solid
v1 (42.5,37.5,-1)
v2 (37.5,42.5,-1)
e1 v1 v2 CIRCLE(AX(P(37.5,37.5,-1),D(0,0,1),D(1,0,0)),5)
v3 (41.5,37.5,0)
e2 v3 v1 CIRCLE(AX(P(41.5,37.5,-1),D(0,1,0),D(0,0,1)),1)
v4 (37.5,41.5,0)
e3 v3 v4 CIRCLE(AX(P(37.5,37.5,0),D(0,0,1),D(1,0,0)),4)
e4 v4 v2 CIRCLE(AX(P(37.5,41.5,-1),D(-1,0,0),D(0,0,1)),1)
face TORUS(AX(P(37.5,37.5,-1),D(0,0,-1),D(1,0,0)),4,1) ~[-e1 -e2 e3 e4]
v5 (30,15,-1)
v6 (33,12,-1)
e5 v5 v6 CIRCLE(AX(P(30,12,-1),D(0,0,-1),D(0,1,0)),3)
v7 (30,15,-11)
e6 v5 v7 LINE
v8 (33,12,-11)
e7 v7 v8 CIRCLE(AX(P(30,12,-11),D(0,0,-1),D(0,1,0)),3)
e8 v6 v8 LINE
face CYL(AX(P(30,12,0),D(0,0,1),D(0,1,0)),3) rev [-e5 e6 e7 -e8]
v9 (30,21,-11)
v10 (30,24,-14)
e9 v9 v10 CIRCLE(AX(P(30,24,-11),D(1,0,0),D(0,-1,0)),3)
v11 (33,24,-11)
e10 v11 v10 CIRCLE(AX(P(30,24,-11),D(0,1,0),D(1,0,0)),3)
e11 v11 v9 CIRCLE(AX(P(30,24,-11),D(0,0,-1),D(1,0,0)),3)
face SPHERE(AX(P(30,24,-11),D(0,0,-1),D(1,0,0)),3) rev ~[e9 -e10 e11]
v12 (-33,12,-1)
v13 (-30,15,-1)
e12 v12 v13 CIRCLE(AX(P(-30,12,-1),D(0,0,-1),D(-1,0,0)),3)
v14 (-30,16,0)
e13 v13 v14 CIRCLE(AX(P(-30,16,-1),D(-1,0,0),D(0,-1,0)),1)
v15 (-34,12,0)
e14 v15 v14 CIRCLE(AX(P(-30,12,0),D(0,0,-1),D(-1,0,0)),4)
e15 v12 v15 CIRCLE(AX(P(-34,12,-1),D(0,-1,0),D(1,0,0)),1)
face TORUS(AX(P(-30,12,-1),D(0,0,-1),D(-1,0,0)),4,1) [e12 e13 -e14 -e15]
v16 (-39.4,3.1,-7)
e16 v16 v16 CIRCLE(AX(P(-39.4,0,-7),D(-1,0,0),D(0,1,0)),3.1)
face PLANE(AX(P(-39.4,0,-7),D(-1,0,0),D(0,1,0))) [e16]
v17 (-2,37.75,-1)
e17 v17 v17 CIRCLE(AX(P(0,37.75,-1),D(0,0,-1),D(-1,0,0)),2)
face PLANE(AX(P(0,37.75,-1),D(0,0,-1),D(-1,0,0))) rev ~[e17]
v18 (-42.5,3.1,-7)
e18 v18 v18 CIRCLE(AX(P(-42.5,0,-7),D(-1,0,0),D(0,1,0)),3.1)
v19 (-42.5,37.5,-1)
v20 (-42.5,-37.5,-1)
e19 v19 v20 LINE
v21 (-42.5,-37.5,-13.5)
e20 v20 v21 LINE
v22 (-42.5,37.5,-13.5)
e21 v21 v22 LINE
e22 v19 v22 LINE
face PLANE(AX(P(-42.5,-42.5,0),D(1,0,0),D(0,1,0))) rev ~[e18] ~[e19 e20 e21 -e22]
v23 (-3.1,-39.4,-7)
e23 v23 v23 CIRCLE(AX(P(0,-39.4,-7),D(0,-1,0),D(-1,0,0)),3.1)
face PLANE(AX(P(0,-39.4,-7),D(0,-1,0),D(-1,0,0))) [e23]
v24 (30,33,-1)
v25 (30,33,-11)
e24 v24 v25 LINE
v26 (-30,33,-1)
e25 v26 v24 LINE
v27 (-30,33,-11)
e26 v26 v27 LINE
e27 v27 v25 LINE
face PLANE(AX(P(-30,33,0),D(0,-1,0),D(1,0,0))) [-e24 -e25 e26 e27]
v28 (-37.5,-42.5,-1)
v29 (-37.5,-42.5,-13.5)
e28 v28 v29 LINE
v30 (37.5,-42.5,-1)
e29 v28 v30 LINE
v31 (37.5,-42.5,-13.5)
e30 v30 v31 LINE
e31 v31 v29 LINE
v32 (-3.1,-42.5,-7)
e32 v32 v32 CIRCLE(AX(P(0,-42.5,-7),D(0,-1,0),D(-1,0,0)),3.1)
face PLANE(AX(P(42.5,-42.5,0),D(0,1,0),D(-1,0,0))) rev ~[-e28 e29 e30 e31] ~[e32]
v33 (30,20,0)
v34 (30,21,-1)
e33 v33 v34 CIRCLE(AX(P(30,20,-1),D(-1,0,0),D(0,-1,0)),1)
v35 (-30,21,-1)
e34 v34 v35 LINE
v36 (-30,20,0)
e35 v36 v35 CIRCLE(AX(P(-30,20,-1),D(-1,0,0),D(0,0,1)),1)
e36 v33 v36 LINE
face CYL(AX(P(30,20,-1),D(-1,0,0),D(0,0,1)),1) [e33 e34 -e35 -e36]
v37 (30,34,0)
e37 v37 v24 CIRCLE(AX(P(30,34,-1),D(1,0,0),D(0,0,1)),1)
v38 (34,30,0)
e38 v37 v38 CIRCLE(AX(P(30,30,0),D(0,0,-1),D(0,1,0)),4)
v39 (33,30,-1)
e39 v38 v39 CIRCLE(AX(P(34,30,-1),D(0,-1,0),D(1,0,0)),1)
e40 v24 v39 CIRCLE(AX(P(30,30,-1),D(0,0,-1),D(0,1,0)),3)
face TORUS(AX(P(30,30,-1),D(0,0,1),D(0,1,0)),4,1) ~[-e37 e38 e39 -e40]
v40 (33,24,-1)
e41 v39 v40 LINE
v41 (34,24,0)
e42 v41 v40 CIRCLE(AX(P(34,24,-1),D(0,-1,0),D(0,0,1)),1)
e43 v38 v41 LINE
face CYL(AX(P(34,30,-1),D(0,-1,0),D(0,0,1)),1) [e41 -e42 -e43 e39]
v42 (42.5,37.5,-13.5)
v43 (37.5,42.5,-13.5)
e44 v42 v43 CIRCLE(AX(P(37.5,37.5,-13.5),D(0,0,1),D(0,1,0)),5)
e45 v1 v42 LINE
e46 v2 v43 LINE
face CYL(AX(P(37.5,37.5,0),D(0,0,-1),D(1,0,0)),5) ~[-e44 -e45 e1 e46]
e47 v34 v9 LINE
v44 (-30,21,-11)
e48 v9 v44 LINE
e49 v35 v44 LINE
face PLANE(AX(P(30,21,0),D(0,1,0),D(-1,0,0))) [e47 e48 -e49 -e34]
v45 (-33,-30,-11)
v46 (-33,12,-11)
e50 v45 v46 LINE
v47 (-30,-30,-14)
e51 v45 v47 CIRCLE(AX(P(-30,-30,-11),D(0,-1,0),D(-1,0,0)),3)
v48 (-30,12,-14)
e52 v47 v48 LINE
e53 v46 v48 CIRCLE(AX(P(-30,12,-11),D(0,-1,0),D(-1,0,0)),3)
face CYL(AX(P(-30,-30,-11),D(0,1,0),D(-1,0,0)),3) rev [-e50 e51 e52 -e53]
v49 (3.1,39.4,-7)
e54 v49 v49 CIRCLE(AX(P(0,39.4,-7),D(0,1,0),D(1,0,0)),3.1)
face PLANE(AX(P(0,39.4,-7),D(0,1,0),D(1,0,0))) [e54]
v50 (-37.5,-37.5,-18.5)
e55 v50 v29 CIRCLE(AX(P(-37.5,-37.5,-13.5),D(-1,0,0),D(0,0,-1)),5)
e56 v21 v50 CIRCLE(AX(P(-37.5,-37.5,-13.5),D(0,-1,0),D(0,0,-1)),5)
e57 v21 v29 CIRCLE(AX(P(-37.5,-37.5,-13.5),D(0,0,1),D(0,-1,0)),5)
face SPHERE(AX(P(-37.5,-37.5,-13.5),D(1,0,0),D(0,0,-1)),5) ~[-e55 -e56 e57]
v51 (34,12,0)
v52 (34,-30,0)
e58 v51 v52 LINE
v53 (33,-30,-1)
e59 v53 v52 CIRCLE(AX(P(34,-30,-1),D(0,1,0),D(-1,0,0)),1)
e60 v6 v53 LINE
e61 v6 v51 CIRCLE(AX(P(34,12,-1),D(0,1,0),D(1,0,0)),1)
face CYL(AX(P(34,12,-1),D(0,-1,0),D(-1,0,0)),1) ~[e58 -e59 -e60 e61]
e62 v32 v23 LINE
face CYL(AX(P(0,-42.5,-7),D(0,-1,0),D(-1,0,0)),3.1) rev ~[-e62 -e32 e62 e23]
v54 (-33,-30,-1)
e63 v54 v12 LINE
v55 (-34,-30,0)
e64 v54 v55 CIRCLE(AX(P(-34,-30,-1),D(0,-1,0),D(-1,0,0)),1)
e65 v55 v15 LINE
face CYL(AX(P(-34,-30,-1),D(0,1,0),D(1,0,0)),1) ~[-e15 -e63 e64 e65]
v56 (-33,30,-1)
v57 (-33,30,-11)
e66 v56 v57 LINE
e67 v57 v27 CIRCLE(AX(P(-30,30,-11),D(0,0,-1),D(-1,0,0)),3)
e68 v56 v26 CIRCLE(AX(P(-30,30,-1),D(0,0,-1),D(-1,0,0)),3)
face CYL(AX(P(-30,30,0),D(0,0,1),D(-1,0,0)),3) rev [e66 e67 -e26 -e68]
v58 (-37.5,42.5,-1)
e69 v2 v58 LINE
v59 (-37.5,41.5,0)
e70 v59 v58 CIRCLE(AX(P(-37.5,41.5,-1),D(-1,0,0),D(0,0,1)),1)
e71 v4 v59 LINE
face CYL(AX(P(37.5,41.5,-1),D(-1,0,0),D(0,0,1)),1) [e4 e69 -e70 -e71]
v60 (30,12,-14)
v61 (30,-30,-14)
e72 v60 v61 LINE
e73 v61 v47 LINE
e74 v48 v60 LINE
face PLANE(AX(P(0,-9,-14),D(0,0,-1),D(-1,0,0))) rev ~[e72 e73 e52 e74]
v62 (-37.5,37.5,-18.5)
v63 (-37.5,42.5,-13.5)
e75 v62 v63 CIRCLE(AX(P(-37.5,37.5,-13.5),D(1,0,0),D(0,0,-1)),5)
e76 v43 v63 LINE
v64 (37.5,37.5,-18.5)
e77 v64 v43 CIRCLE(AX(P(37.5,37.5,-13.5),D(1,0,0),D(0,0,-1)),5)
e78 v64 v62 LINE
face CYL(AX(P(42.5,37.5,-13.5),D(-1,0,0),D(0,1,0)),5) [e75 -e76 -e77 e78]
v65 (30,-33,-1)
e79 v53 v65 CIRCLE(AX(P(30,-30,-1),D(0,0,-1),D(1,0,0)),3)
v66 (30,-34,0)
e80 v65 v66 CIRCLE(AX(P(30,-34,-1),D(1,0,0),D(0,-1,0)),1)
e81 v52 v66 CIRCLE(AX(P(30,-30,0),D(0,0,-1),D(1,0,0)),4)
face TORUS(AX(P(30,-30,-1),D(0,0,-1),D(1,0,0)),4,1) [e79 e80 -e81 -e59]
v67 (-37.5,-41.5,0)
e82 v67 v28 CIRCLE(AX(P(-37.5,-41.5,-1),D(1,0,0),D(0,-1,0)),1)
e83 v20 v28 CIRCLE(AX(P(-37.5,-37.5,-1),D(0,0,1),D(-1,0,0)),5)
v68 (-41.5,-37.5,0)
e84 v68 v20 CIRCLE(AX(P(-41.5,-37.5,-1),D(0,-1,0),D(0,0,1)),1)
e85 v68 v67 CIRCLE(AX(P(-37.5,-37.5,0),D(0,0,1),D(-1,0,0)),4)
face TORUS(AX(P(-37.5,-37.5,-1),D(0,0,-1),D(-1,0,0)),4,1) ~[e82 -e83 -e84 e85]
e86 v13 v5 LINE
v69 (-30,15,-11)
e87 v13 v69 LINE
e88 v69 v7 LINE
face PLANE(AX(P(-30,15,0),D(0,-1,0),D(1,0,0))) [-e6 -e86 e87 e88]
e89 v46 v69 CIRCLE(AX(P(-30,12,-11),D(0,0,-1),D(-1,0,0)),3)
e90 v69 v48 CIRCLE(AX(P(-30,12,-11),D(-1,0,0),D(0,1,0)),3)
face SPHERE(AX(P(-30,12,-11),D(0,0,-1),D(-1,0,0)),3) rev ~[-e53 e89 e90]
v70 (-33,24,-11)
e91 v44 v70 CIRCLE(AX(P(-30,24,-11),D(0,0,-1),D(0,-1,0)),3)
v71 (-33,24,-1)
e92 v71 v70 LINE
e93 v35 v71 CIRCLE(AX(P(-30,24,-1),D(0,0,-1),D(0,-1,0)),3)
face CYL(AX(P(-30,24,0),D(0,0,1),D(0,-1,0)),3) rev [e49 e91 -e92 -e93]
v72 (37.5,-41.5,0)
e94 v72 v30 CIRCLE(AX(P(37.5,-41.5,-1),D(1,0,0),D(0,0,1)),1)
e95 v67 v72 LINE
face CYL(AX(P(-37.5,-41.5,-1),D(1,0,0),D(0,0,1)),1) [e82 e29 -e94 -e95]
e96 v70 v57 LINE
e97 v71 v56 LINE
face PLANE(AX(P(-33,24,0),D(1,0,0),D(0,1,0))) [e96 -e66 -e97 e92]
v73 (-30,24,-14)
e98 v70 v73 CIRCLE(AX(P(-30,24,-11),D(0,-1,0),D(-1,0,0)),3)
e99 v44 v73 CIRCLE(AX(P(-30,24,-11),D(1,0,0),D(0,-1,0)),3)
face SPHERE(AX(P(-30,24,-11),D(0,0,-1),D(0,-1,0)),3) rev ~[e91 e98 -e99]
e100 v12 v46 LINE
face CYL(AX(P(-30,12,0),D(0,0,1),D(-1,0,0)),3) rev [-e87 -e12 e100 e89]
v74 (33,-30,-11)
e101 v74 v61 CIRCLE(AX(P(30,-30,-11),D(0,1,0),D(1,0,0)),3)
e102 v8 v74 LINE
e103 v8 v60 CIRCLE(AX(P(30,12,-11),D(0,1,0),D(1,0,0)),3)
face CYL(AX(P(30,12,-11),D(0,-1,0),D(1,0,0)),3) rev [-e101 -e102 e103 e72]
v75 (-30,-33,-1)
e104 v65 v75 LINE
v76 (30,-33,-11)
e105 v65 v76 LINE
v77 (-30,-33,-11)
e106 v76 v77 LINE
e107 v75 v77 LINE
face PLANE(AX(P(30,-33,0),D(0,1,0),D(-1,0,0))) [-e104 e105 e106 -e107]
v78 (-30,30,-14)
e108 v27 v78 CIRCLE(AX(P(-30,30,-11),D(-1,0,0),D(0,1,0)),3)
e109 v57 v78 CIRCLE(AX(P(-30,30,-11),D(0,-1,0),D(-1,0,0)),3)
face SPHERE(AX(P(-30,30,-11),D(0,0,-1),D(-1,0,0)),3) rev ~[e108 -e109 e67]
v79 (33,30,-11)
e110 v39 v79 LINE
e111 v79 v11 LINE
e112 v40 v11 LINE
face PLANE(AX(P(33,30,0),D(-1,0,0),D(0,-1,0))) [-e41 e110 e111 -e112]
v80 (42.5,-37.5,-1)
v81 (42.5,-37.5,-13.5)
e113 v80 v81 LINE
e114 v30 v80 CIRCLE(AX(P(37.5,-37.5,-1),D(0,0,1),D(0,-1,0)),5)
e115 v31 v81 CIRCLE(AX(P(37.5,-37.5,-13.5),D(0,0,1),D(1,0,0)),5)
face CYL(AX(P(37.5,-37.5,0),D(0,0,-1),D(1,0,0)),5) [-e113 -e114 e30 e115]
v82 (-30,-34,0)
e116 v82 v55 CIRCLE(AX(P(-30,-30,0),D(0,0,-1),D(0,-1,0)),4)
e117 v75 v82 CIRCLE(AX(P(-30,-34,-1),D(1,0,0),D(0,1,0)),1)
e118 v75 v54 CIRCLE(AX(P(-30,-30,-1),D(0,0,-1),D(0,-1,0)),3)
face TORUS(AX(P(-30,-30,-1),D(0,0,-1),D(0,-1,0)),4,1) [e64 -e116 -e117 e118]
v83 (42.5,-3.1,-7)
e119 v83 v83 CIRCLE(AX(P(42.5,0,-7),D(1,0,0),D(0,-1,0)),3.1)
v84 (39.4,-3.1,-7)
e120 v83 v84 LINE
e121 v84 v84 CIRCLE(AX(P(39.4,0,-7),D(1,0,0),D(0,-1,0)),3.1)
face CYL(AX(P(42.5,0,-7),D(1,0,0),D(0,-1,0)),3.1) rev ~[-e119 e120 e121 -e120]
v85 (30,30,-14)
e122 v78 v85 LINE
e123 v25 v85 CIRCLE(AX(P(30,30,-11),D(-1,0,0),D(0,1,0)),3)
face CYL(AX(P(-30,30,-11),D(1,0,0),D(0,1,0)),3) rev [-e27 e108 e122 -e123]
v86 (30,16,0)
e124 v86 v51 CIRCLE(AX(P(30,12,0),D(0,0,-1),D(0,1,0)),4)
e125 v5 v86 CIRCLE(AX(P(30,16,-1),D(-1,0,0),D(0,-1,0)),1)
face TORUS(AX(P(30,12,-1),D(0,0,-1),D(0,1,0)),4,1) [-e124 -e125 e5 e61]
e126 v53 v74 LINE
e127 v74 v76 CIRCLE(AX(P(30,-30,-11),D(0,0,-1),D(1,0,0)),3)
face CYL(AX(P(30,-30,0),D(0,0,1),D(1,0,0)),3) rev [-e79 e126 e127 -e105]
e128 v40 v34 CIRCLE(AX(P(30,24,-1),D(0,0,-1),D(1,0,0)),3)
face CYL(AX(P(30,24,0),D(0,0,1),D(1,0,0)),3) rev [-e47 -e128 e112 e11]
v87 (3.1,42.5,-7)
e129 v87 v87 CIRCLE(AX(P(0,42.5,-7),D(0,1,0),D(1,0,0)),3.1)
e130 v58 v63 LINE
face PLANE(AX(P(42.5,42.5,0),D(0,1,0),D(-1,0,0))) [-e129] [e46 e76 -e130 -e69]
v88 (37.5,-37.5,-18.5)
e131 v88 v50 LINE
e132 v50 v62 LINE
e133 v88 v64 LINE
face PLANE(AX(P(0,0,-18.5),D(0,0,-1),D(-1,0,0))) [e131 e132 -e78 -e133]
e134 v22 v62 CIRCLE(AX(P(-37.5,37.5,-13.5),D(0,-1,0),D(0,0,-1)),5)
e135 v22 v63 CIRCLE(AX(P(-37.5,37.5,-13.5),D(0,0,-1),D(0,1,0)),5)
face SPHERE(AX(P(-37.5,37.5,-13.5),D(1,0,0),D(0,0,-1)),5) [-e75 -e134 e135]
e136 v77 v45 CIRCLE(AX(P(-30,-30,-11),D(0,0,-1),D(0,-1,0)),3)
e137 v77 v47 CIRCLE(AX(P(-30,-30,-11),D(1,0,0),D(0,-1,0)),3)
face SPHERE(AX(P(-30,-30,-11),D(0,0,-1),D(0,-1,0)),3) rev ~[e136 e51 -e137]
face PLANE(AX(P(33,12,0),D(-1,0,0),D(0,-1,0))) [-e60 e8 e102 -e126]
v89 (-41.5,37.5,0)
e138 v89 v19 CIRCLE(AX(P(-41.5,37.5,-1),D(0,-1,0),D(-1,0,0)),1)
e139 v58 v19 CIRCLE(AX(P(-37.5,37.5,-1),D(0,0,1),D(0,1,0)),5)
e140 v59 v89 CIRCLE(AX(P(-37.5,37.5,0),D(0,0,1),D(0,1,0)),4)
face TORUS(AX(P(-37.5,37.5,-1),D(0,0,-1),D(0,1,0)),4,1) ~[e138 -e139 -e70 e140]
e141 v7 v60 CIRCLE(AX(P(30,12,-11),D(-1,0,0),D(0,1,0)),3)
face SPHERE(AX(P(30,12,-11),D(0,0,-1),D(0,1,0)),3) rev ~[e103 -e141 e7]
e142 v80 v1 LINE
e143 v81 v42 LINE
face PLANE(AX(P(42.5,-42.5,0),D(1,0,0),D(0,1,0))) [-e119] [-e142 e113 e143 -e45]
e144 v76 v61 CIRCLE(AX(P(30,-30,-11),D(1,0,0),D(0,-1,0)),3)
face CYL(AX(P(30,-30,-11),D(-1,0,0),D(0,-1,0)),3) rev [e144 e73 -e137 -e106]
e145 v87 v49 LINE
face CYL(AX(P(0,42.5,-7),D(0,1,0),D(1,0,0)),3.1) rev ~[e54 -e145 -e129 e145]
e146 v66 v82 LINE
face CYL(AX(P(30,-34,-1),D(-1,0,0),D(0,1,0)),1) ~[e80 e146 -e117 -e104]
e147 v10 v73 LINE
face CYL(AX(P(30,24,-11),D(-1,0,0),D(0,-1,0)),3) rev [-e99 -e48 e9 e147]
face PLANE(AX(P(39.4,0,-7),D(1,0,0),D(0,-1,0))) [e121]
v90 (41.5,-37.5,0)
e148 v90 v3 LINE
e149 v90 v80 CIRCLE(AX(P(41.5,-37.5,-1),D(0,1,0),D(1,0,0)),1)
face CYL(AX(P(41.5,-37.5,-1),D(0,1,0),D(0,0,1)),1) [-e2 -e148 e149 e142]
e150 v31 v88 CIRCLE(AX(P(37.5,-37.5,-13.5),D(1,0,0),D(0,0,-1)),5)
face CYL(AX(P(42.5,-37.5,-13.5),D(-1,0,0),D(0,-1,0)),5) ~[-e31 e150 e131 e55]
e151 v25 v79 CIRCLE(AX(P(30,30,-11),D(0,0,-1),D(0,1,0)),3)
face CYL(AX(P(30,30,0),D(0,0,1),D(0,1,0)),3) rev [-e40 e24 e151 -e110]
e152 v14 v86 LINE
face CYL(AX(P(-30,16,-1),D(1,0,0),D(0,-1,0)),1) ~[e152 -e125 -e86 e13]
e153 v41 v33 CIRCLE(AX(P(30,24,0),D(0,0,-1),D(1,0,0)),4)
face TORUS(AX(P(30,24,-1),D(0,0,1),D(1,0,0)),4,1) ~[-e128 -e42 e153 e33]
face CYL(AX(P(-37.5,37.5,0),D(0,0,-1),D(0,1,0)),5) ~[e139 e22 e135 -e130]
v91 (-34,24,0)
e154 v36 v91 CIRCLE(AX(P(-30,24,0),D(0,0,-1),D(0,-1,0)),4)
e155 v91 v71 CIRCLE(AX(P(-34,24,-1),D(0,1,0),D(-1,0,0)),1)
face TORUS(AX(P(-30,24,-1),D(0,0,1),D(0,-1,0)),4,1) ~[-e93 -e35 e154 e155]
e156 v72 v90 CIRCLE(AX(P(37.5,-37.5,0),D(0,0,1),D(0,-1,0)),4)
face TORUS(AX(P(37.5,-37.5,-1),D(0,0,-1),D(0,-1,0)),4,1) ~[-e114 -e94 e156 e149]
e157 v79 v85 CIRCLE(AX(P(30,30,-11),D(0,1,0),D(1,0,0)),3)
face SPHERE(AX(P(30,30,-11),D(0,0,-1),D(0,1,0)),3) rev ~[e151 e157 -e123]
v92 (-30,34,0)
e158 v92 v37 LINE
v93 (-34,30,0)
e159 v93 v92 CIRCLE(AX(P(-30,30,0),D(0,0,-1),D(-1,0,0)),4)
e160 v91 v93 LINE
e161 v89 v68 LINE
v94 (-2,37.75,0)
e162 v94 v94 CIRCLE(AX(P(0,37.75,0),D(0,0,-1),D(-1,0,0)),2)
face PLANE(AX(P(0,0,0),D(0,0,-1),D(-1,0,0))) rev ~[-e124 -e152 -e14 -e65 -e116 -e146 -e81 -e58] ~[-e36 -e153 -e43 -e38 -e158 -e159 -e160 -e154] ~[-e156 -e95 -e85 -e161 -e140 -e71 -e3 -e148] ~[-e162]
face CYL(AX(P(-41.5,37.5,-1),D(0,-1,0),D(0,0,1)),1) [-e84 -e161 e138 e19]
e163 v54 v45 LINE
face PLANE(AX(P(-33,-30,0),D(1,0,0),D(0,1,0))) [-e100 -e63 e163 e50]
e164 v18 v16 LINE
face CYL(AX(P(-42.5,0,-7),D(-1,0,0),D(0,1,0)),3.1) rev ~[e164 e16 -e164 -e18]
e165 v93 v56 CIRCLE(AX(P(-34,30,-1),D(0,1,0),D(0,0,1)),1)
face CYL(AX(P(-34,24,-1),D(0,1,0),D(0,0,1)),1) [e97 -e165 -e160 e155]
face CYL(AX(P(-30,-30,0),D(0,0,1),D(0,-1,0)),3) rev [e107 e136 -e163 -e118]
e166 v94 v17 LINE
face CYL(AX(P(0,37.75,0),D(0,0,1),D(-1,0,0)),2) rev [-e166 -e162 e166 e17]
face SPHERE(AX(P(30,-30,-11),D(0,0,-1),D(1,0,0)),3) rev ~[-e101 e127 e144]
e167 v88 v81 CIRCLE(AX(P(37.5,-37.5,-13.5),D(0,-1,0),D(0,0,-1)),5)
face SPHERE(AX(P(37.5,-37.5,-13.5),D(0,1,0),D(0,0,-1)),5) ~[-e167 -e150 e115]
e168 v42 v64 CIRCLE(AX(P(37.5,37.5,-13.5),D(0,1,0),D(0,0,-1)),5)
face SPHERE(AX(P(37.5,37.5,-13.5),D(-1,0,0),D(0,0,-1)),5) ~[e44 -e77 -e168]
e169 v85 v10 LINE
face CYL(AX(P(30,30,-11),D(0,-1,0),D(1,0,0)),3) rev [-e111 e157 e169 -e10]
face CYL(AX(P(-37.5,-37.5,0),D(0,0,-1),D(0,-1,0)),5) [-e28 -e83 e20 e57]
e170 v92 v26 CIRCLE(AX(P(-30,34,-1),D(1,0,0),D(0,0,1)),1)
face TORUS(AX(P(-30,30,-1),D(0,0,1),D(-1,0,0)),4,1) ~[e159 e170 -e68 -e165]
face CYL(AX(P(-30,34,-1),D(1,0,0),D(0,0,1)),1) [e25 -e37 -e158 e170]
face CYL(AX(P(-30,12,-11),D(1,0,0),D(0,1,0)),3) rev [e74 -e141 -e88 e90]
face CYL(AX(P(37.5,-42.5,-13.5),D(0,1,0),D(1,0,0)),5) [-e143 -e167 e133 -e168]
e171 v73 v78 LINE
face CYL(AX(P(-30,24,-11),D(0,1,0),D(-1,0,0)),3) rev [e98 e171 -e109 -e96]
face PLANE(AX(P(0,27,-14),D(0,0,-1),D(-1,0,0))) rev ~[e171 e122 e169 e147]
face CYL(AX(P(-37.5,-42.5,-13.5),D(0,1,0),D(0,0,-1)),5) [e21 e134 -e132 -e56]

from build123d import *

# Parameters (mm, degrees)
F0_W      = 85
F0_H      = 85
F0_R      = 2
F3_DEPTH  = 18.5
F4_DEPTH  = 14
F5_R      = 5
F6_R      = 3
F7_R      = 1
F8_R      = 3.1
F9_DEPTH  = 3.1
F10_R     = 3.1
F11_DEPTH = 3.1
F12_R     = 3.1
F13_DEPTH = 3.1
F14_R     = 3.1
F15_DEPTH = 3.1
F16_DEPTH = 1
F17_ANGLE = 180


# Not quite as in the source:
# - a feature names something its author has since deleted; it is built from what else it names


with BuildPart() as f3:
    # F0 (on Top) → F3 (new body)
    with BuildSketch(Plane.XY):
        Rectangle(F0_W, F0_H)
        with BuildLine():
            ThreePointArc((-33, 12), (-32.1213203436, 14.1213203436), (-30, 15))
            Line((-30, 15), (30, 15))
            ThreePointArc((30, 15), (32.1213203436, 14.1213203436), (33, 12))
            Line((33, 12), (33, -30))
            ThreePointArc((33, -30), (32.1213203436, -32.1213203436), (30, -33))
            Line((30, -33), (-30, -33))
            ThreePointArc((-30, -33), (-32.1213203436, -32.1213203436), (-33, -30))
            Line((-33, -30), (-33, 12))
        make_face(mode=Mode.SUBTRACT)
        with BuildLine():
            ThreePointArc((-33, 30), (-32.1213203436, 32.1213203436), (-30, 33))
            Line((-30, 33), (30, 33))
            ThreePointArc((30, 33), (32.1213203436, 32.1213203436), (33, 30))
            Line((33, 30), (33, 24))
            ThreePointArc((33, 24), (32.1213203436, 21.8786796564), (30, 21))
            Line((30, 21), (-30, 21))
            ThreePointArc((-30, 21), (-32.1213203436, 21.8786796564), (-33, 24))
            Line((-33, 24), (-33, 30))
        make_face(mode=Mode.SUBTRACT)
        with Locations((0, 37.75)):
            Circle(F0_R, mode=Mode.SUBTRACT)
        with BuildLine():
            Line((30, 15), (-30, 15))
            ThreePointArc((-30, 15), (-32.1213203436, 14.1213203436), (-33, 12))
            Line((-33, 12), (-33, -30))
            ThreePointArc((-33, -30), (-32.1213203436, -32.1213203436), (-30, -33))
            Line((-30, -33), (30, -33))
            ThreePointArc((30, -33), (32.1213203436, -32.1213203436), (33, -30))
            Line((33, -30), (33, 12))
            ThreePointArc((33, 12), (32.1213203436, 14.1213203436), (30, 15))
        make_face()
        with BuildLine():
            Line((30, 33), (-30, 33))
            ThreePointArc((-30, 33), (-32.1213203436, 32.1213203436), (-33, 30))
            Line((-33, 30), (-33, 24))
            ThreePointArc((-33, 24), (-32.1213203436, 21.8786796564), (-30, 21))
            Line((-30, 21), (30, 21))
            ThreePointArc((30, 21), (32.1213203436, 21.8786796564), (33, 24))
            Line((33, 24), (33, 30))
            ThreePointArc((33, 30), (32.1213203436, 32.1213203436), (30, 33))
        make_face()
        with Locations((0, 37.75)):
            Circle(F0_R)
    extrude(amount=F3_DEPTH)

    # F0 (on Top) → F4 (cut)
    with BuildSketch(Plane.XY):
        with BuildLine():
            Line((30, 33), (-30, 33))
            ThreePointArc((-30, 33), (-32.1213203436, 32.1213203436), (-33, 30))
            Line((-33, 30), (-33, 24))
            ThreePointArc((-33, 24), (-32.1213203436, 21.8786796564), (-30, 21))
            Line((-30, 21), (30, 21))
            ThreePointArc((30, 21), (32.1213203436, 21.8786796564), (33, 24))
            Line((33, 24), (33, 30))
            ThreePointArc((33, 30), (32.1213203436, 32.1213203436), (30, 33))
        make_face()
        with BuildLine():
            Line((30, 15), (-30, 15))
            ThreePointArc((-30, 15), (-32.1213203436, 14.1213203436), (-33, 12))
            Line((-33, 12), (-33, -30))
            ThreePointArc((-33, -30), (-32.1213203436, -32.1213203436), (-30, -33))
            Line((-30, -33), (30, -33))
            ThreePointArc((30, -33), (32.1213203436, -32.1213203436), (33, -30))
            Line((33, -30), (33, 12))
            ThreePointArc((33, 12), (32.1213203436, 14.1213203436), (30, 15))
        make_face()
    extrude(amount=F4_DEPTH, mode=Mode.SUBTRACT)

    # F5
    f5_edges = [f3.edges().sort_by_distance(p)[0] for p in [
        (0, 42.5, 18.5),
        (-42.5, 0, 18.5),
        (0, -42.5, 18.5),
        (42.5, 0, 18.5),
        (42.5, 42.5, 9.25),
        (-42.5, 42.5, 9.25),
        (-42.5, -42.5, 9.25),
        (42.5, -42.5, 9.25),
    ]]
    fillet(f5_edges, radius=F5_R)

    # F6
    f6_edges = [f3.edges().sort_by_distance(p)[0] for p in [
        (0, 33, 14),
        (-32.12132, 32.12132, 14),
        (-33, 27, 14),
        (-32.12132, 21.87868, 14),
        (0, 21, 14),
        (32.12132, 21.87868, 14),
        (33, 27, 14),
        (32.12132, 32.12132, 14),
        (0, 15, 14),
        (-32.12132, 14.12132, 14),
        (-33, -9, 14),
        (-32.12132, -32.12132, 14),
        (0, -33, 14),
        (32.12132, -32.12132, 14),
        (33, -9, 14),
        (32.12132, 14.12132, 14),
    ]]
    fillet(f6_edges, radius=F6_R)

    # F7
    f7_edges = [f3.edges().sort_by_distance(p)[0] for p in [
        (0, 42.5, 0),
        (41.035534, 41.035534, 0),
        (-41.035534, 41.035534, 0),
        (42.5, 0, 0),
        (-42.5, 0, 0),
        (41.035534, -41.035534, 0),
        (-41.035534, -41.035534, 0),
        (0, -42.5, 0),
        (0, 15, 0),
        (-32.12132, 14.12132, 0),
        (-33, -9, 0),
        (-32.12132, -32.12132, 0),
        (0, -33, 0),
        (32.12132, -32.12132, 0),
        (33, -9, 0),
        (32.12132, 14.12132, 0),
        (0, 33, 0),
        (-32.12132, 32.12132, 0),
        (-33, 27, 0),
        (-32.12132, 21.87868, 0),
        (0, 21, 0),
        (32.12132, 21.87868, 0),
        (33, 27, 0),
        (32.12132, 32.12132, 0),
    ]]
    fillet(f7_edges, radius=F7_R)

    # F8 (on face) → F9 (cut)
    with BuildSketch(Plane.XZ.offset(42.5)):
        with Locations((0, 7)):
            Circle(F8_R)
    extrude(amount=-F9_DEPTH, mode=Mode.SUBTRACT)

    # F10 (on face) → F11 (cut)
    with BuildSketch(Plane(origin=(0, 42.5, 0), x_dir=(-1, 0, 0), z_dir=(0, 1, 0))):
        with Locations((0, 7)):
            Circle(F10_R)
    extrude(amount=-F11_DEPTH, mode=Mode.SUBTRACT)

    # F12 (on face) → F13 (cut)
    with BuildSketch(Plane(origin=(-42.5, 0, 0), x_dir=(0, -1, 0), z_dir=(-1, 0, 0))):
        with Locations((0, 7)):
            Circle(F12_R)
    extrude(amount=-F13_DEPTH, mode=Mode.SUBTRACT)

    # F14 (on face) → F15 (cut)
    with BuildSketch(Plane.YZ.offset(42.5)):
        with Locations((0, 7)):
            Circle(F14_R)
    extrude(amount=-F15_DEPTH, mode=Mode.SUBTRACT)

    # F0 (on Top) → F16 (cut)
    with BuildSketch(Plane.XY):
        with Locations((0, 37.75)):
            Circle(F0_R)
    extrude(amount=F16_DEPTH, mode=Mode.SUBTRACT)


with BuildPart() as f3_1:
    # F17: moved
    add(f3.part.rotate(Axis((0, 0, 0), (0, 1, 0)), F17_ANGLE))


solid = f3_1.part
